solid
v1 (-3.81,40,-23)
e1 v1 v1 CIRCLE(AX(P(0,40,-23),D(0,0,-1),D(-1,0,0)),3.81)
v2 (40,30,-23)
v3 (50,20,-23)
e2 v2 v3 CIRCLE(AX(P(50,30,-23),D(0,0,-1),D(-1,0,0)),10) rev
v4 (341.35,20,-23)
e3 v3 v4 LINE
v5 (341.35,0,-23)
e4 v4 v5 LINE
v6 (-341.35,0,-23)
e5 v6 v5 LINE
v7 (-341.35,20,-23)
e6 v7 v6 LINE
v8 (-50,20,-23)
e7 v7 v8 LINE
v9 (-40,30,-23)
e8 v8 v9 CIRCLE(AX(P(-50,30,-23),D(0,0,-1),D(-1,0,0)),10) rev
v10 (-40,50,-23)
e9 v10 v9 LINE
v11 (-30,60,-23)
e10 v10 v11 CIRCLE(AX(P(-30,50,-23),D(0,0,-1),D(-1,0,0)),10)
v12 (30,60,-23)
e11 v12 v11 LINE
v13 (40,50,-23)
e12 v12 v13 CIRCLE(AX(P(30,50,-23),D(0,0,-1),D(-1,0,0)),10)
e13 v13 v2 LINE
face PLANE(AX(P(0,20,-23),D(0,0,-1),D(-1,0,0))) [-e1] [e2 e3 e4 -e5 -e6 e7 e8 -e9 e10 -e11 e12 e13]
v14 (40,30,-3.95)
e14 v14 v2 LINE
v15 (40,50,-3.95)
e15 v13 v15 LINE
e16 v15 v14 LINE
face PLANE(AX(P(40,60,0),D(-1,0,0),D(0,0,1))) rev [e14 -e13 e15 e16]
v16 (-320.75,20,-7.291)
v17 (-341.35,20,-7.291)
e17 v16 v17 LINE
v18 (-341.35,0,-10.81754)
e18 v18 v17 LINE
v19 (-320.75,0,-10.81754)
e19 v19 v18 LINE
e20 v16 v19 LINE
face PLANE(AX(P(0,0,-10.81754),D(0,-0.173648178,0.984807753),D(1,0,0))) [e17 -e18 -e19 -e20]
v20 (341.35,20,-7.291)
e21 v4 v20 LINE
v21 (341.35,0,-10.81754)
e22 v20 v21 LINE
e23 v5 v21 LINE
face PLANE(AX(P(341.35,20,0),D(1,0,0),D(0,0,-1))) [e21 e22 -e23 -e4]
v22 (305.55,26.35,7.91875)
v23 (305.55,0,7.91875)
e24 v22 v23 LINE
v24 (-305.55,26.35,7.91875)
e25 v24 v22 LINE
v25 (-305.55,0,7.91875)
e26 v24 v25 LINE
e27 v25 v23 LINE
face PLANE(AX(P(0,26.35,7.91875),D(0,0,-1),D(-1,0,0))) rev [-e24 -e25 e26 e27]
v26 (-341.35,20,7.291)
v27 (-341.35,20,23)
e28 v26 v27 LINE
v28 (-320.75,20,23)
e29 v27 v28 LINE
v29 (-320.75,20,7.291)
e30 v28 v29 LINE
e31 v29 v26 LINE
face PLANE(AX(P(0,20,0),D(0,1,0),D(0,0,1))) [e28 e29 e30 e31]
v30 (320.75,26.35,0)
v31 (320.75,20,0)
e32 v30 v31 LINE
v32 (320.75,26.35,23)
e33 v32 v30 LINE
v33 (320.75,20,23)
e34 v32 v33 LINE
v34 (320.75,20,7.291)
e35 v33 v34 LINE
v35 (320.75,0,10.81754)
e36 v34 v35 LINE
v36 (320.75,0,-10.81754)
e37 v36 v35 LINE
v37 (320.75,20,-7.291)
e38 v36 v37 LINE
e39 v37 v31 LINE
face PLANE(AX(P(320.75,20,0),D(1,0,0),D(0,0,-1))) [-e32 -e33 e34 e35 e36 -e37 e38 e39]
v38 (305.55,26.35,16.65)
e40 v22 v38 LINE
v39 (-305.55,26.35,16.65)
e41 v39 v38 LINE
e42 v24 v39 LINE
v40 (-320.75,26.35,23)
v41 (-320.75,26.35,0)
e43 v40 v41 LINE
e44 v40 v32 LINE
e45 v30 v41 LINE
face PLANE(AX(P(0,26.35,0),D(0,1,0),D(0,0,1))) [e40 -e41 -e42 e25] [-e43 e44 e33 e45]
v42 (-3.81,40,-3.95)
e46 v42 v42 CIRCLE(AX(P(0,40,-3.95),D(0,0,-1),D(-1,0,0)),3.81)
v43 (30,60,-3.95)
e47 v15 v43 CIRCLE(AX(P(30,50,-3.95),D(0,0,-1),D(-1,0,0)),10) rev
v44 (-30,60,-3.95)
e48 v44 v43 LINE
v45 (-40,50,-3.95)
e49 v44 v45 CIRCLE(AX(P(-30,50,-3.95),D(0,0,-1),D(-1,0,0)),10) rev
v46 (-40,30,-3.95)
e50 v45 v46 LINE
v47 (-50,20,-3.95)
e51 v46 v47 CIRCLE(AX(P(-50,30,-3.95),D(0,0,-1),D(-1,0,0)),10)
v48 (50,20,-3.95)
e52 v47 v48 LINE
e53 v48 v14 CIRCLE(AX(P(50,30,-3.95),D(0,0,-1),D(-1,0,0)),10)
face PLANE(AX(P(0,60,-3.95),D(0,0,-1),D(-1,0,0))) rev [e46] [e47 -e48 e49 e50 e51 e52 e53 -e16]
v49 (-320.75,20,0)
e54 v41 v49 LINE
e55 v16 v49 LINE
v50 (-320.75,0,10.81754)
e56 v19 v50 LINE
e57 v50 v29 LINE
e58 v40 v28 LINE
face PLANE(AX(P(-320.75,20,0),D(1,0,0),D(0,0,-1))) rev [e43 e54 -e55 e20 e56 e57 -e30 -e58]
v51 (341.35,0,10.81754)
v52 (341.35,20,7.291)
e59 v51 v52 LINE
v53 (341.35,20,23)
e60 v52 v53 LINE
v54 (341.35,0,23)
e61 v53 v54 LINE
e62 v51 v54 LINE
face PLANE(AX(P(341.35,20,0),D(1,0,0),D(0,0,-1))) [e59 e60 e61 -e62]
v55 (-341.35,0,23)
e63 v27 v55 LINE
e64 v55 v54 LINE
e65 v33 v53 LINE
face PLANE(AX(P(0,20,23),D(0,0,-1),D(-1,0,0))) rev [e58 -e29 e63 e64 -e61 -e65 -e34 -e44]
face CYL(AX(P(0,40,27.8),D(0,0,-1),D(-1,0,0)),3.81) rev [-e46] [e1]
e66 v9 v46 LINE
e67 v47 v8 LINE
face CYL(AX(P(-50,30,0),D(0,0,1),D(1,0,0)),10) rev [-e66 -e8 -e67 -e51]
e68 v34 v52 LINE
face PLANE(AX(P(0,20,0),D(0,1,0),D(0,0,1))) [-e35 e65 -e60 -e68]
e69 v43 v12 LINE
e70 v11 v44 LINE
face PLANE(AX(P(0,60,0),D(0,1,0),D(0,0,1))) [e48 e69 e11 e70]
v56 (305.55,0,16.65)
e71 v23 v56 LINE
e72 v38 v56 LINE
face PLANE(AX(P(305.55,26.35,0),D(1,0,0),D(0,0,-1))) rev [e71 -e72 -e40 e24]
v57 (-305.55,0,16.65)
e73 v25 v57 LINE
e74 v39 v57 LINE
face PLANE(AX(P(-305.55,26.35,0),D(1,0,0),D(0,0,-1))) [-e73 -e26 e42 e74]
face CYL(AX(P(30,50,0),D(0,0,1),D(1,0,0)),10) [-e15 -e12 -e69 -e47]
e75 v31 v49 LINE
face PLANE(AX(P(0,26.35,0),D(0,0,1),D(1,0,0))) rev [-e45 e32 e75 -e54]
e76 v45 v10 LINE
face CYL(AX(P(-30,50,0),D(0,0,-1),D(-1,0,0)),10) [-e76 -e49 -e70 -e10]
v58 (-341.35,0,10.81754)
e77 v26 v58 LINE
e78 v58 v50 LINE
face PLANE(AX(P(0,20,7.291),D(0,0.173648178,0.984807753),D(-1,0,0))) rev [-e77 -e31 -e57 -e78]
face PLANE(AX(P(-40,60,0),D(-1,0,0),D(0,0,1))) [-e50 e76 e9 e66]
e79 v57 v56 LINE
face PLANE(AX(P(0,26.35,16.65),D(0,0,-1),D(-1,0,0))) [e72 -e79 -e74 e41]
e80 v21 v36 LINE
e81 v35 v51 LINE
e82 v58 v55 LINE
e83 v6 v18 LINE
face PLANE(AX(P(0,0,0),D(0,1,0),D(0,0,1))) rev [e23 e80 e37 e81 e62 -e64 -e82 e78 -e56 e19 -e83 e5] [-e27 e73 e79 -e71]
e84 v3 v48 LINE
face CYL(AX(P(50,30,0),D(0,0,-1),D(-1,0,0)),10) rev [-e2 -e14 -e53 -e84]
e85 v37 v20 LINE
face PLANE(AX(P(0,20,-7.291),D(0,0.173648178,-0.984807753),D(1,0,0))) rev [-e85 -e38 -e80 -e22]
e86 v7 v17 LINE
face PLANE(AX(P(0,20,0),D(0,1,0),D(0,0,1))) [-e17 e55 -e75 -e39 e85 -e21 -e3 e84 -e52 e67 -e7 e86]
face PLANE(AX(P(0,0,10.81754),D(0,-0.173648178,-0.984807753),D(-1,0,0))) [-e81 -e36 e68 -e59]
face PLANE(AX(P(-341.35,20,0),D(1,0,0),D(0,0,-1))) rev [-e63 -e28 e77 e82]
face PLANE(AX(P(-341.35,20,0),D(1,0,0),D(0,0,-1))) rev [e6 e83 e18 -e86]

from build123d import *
from OCP.BRepFilletAPI import BRepFilletAPI_MakeChamfer

# Parameters (mm, degrees)
BOSS_EXTRUDE1_DEPTH = 20
SKETCH2_W           = 641.5
SKETCH2_H           = 23
SKETCH2_W_2         = 611.1
SKETCH2_H_2         = 8.73125
BOSS_EXTRUDE2_DEPTH = 6.35
SKETCH4_W           = 80
SKETCH4_H           = 19.05
BOSS_EXTRUDE3_DEPTH = 40
CUT_EXTRUDE2_DEPTH  = 50.8
CHAMFER1_SIZE       = 20
CHAMFER1_SIZE_2     = 3.526539614
SKETCH2_3_W         = 305.55
SKETCH2_3_H         = 8.73125
CUT_EXTRUDE3_DEPTH  = 20
FILLET1_R           = 10


with BuildPart() as part:
    # Sketch1 → Boss-Extrude1 (new body)
    with BuildSketch(Plane(origin=(0, 0, 0), x_dir=(1, 0, 0), z_dir=(0, 1, 0))):
        Polygon((-341.35, 23), (-341.35, 7.291), (-320.75, 7.291), (-320.75, -7.291), (-341.35, -7.291), (-341.35, -23), (341.35, -23), (341.35, -7.291), (320.75, -7.291), (320.75, 7.291), (341.35, 7.291), (341.35, 23), align=None)
    extrude(amount=BOSS_EXTRUDE1_DEPTH)

    # Sketch2 → Boss-Extrude2 (add)
    with BuildSketch(Plane(origin=(0, 20, 0), x_dir=(1, 0, 0), z_dir=(0, 1, 0))):
        with Locations((0, -11.5)):
            Rectangle(SKETCH2_W, SKETCH2_H)
        with Locations((0, -12.284375)):
            Rectangle(SKETCH2_W_2, SKETCH2_H_2, mode=Mode.SUBTRACT)
    extrude(amount=BOSS_EXTRUDE2_DEPTH)

    # Sketch4 → Boss-Extrude3 (add)
    with BuildSketch(Plane(origin=(0, 20, 0), x_dir=(1, 0, 0), z_dir=(0, 1, 0))):
        with Locations((0, 13.475)):
            Rectangle(SKETCH4_W, SKETCH4_H)
    extrude(amount=BOSS_EXTRUDE3_DEPTH)

    # Sketch5 → Cut-Extrude2 (cut)
    with BuildSketch(Plane(origin=(0, 0, -23), x_dir=(-1, 0, 0), z_dir=(0, 0, -1))):
        with BuildLine():
            ThreePointArc((3.407767598, 41.703883799), (0, 43.81), (-3.407767598, 41.703883799))
            Line((-3.407767598, 41.703883799), (0, 40))
            Line((0, 40), (3.407767598, 41.703883799))
        make_face()
        with BuildLine():
            Line((0, 40), (-3.407767598, 41.703883799))
            ThreePointArc((-3.407767598, 41.703883799), (-3.81, 40), (-3.407767598, 38.296116201))
            Line((-3.407767598, 38.296116201), (0, 40))
        make_face()
        with BuildLine():
            Line((3.407767598, 41.703883799), (0, 40))
            Line((0, 40), (3.407767598, 38.296116201))
            ThreePointArc((3.407767598, 38.296116201), (3.70807865, 39.124641373), (3.81, 40))
            ThreePointArc((3.81, 40), (3.70807865, 40.875358627), (3.407767598, 41.703883799))
        make_face()
        with BuildLine():
            Line((3.407767598, 38.296116201), (0, 40))
            Line((0, 40), (-3.407767598, 38.296116201))
            ThreePointArc((-3.407767598, 38.296116201), (0, 36.19), (3.407767598, 38.296116201))
        make_face()
    extrude(amount=-CUT_EXTRUDE2_DEPTH, mode=Mode.SUBTRACT)

    # Chamfer1
    chamfer1_edges_1 = [part.edges().sort_by_distance(p)[0] for p in [
        (331.05, 0, -7.291),
    ]]
    chamfer1_side_1 = [part.faces().sort_by_distance(p)[0] for p in [
        (331.05, 0.070530792, -7.291),
    ]]
    chamfer1_edges_2 = [part.edges().sort_by_distance(p)[0] for p in [
        (331.05, 0, 7.291),
    ]]
    chamfer1_side_2 = [part.faces().sort_by_distance(p)[0] for p in [
        (331.05, 0, 7.361530792),
    ]]
    chamfer1_edges_3 = [part.edges().sort_by_distance(p)[0] for p in [
        (-331.05, 0, 7.291),
    ]]
    chamfer1_side_3 = [part.faces().sort_by_distance(p)[0] for p in [
        (-331.05, 0, 7.361530792),
    ]]
    chamfer1_edges_4 = [part.edges().sort_by_distance(p)[0] for p in [
        (-331.05, 0, -7.291),
    ]]
    chamfer1_side_4 = [part.faces().sort_by_distance(p)[0] for p in [
        (-331.05, 0, -7.361530792),
    ]]
    chamfer1 = BRepFilletAPI_MakeChamfer(part.part.solid().wrapped)
    for e in chamfer1_edges_1:
        chamfer1.Add(CHAMFER1_SIZE - 0.0001, CHAMFER1_SIZE_2 - 0.0001, e.wrapped, chamfer1_side_1[0].wrapped)
    for e in chamfer1_edges_2:
        chamfer1.Add(CHAMFER1_SIZE_2 - 0.0001, CHAMFER1_SIZE - 0.0001, e.wrapped, chamfer1_side_2[0].wrapped)
    for e in chamfer1_edges_3:
        chamfer1.Add(CHAMFER1_SIZE_2 - 0.0001, CHAMFER1_SIZE - 0.0001, e.wrapped, chamfer1_side_3[0].wrapped)
    for e in chamfer1_edges_4:
        chamfer1.Add(CHAMFER1_SIZE_2 - 0.0001, CHAMFER1_SIZE - 0.0001, e.wrapped, chamfer1_side_4[0].wrapped)
    add(Compound.cast(chamfer1.Shape()), mode=Mode.REPLACE)  # a hair under: the kernel refuses the full size

    # Sketch2<3> → Cut-Extrude3 (cut)
    with BuildSketch(Plane(origin=(0, 20, 0), x_dir=(1, 0, 0), z_dir=(0, 1, 0))):
        with Locations((-152.775, -12.284375)):
            Rectangle(SKETCH2_3_W, SKETCH2_3_H)
        with Locations((152.775, -12.284375)):
            Rectangle(SKETCH2_3_W, SKETCH2_3_H)
    extrude(amount=-CUT_EXTRUDE3_DEPTH, mode=Mode.SUBTRACT)

    # Fillet1
    fillet1_edges = [part.edges().sort_by_distance(p)[0] for p in [
        (40, 20, -13.475),
        (-40, 60, -13.475),
        (40, 60, -13.475),
        (-40, 20, -13.475),
    ]]
    fillet(fillet1_edges, radius=FILLET1_R)


solid = part.part
